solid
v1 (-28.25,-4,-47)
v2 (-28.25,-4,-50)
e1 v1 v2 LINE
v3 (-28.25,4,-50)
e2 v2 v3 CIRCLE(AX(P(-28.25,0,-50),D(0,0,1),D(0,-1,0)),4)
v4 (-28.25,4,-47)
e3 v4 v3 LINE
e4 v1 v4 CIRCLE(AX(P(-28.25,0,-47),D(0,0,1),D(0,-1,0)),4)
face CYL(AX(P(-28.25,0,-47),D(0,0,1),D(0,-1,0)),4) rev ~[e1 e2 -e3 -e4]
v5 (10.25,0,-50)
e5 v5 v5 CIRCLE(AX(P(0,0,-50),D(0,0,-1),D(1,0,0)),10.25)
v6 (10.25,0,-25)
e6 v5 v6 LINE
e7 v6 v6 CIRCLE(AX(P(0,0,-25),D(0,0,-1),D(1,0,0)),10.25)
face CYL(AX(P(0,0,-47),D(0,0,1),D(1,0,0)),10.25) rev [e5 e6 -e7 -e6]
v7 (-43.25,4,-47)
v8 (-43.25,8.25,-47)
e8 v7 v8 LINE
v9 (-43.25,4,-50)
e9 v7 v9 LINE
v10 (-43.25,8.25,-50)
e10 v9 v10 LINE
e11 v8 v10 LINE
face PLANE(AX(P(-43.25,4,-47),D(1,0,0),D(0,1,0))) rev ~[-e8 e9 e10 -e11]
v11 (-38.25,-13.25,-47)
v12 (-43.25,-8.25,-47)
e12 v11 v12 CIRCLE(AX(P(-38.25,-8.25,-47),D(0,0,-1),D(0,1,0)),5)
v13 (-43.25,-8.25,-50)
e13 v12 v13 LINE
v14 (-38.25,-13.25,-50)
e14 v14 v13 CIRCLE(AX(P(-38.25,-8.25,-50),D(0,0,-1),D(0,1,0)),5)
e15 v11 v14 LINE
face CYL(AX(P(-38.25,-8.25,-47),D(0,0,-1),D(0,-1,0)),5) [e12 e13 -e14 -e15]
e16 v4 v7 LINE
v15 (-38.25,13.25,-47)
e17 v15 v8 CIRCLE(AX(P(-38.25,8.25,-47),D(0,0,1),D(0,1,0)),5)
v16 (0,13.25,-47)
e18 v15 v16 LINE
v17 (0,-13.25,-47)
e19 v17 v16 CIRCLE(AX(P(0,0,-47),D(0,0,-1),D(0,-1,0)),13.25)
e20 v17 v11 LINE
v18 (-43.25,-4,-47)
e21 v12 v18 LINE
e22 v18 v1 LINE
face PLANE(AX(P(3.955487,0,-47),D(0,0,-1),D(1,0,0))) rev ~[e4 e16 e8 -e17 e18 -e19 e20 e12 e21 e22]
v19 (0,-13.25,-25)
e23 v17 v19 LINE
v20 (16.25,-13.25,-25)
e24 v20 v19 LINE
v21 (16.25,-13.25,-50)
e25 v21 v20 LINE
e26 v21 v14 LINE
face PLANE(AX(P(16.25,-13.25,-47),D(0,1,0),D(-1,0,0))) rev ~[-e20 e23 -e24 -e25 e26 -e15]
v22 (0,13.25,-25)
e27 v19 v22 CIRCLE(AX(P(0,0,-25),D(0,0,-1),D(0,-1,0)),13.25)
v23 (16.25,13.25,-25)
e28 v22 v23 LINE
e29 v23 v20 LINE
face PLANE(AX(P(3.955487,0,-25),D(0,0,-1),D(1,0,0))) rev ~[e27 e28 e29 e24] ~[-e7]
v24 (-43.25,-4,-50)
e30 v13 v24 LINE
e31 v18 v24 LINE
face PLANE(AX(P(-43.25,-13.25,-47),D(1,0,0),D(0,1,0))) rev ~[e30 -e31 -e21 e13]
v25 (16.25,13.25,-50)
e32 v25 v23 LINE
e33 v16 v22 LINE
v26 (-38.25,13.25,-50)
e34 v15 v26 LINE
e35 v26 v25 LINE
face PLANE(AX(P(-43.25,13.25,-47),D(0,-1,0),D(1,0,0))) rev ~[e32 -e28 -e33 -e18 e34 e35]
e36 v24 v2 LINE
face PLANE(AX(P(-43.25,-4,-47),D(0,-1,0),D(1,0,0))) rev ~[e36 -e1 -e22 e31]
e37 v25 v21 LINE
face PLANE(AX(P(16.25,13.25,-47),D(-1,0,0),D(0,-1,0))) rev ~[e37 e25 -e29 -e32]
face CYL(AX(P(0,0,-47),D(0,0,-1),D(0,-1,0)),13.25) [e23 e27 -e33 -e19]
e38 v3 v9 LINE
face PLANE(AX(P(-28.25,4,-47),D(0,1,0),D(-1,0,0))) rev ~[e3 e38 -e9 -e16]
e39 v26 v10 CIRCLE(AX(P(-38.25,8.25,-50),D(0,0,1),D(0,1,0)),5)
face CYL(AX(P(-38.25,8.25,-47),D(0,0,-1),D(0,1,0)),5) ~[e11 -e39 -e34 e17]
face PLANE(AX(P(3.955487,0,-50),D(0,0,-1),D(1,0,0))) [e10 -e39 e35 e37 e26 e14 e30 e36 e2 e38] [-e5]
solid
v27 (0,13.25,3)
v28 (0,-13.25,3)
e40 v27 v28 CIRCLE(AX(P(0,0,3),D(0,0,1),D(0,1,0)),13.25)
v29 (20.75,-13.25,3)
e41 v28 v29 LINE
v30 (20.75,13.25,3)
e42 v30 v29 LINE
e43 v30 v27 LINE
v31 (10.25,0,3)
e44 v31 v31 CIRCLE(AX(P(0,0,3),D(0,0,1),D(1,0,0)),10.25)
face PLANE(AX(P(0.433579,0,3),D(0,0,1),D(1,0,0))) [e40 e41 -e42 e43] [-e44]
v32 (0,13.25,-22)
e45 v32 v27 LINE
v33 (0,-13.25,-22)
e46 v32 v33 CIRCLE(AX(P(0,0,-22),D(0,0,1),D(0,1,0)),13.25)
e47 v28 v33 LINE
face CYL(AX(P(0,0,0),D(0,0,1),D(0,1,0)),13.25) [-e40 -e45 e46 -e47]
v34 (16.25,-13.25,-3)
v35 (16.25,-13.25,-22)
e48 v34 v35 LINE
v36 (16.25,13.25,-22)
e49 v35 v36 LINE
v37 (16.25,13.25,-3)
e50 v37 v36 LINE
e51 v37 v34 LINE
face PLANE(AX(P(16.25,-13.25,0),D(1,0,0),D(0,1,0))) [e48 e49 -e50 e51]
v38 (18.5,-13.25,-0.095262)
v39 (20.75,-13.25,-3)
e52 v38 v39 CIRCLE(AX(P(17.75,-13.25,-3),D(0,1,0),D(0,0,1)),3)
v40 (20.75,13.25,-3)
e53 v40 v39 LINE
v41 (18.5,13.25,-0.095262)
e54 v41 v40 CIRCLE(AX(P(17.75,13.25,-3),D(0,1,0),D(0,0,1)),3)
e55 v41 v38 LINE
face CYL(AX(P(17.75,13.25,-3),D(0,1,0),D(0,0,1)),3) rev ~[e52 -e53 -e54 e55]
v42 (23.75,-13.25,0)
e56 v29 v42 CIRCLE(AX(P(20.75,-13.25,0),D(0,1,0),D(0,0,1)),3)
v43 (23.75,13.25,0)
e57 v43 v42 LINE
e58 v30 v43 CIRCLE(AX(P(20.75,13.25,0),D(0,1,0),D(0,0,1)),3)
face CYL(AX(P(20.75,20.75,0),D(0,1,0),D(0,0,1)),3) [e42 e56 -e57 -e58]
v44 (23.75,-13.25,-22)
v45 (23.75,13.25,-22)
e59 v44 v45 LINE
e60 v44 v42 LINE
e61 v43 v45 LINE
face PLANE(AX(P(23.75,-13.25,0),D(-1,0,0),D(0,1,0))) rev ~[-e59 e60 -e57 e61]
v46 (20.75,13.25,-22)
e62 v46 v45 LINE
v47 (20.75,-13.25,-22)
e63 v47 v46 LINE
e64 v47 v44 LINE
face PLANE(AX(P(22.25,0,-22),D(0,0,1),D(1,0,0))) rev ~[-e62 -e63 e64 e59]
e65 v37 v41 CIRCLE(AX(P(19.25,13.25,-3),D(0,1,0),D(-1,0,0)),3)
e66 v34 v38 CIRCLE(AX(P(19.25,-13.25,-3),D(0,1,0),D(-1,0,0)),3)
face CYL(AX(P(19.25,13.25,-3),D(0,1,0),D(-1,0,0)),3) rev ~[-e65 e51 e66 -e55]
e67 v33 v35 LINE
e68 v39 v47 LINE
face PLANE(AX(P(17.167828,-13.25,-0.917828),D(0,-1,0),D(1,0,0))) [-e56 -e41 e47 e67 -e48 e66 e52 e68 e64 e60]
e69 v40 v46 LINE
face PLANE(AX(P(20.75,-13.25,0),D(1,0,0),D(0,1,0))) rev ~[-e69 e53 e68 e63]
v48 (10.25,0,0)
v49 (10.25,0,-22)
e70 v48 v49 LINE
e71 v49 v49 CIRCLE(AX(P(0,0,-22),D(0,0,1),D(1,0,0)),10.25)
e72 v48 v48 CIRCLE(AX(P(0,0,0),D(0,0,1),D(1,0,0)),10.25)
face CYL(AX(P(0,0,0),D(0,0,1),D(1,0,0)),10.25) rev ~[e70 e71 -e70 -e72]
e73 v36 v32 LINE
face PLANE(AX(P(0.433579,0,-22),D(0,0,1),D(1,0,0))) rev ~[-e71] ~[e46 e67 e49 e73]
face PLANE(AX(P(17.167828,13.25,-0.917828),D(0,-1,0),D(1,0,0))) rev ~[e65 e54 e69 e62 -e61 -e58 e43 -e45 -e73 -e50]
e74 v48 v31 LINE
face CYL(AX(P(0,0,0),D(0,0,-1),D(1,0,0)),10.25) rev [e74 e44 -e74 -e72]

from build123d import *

# Parameters (mm, degrees)
F0_R        = 10.25
F0_W        = 4.5
F0_H        = 26.5
F0_W_2      = 3
F1_DEPTH    = 3
F2_DEPTH    = 22
F3_T1_DEPTH = 26.5
F3_T3_DEPTH = 41.5
F5_R        = 10.25
F6_DEPTH    = 22
F7_DEPTH    = 3
F8_R        = 5


# Not quite as in the source:
# - a fillet or chamfer that OpenCascade refuses, or shapes differently, is made with other operations: its cross-section is extruded or revolved along the edge and cut away or added


with BuildPart() as f1:
    # F0 (on Top) → F1 (new body)
    with BuildSketch(Plane.XY):
        with BuildLine():
            ThreePointArc((0, -13.25), (9.3691648507, -9.3691648507), (13.25, 0))
            ThreePointArc((13.25, 0), (9.3691648507, 9.3691648507), (0, 13.25))
            ThreePointArc((0, 13.25), (-13.25, 0), (0, -13.25))
        make_face()
        Circle(F0_R, mode=Mode.SUBTRACT)
        with BuildLine():
            Line((13.25, -13.25), (13.25, 0))
            ThreePointArc((13.25, 0), (9.3691648507, -9.3691648507), (0, -13.25))
            Line((0, -13.25), (13.25, -13.25))
        make_face()
        with BuildLine():
            ThreePointArc((0, 13.25), (9.3691648507, 9.3691648507), (13.25, 0))
            Line((13.25, 0), (13.25, 13.25))
            Line((13.25, 13.25), (0, 13.25))
        make_face()
        Polygon((13.25, 13.25), (13.25, 0), (13.25, -13.25), (16.25, -13.25), (16.25, 13.25), align=None)
        with Locations((18.5, 0)):
            Rectangle(F0_W, F0_H)
        with Locations((22.25, 0)):
            Rectangle(F0_W_2, F0_H)
    extrude(amount=F1_DEPTH)

    # F0 (on Top) → F2 (join)
    with BuildSketch(Plane.XY):
        with BuildLine():
            ThreePointArc((0, -13.25), (9.3691648507, -9.3691648507), (13.25, 0))
            ThreePointArc((13.25, 0), (9.3691648507, 9.3691648507), (0, 13.25))
            ThreePointArc((0, 13.25), (-13.25, 0), (0, -13.25))
        make_face()
        Circle(F0_R, mode=Mode.SUBTRACT)
        with BuildLine():
            ThreePointArc((0, 13.25), (9.3691648507, 9.3691648507), (13.25, 0))
            Line((13.25, 0), (13.25, 13.25))
            Line((13.25, 13.25), (0, 13.25))
        make_face()
        Polygon((13.25, 13.25), (13.25, 0), (13.25, -13.25), (16.25, -13.25), (16.25, 13.25), align=None)
        with Locations((22.25, 0)):
            Rectangle(F0_W_2, F0_H)
        with BuildLine():
            Line((13.25, -13.25), (13.25, 0))
            ThreePointArc((13.25, 0), (9.3691648507, -9.3691648507), (0, -13.25))
            Line((0, -13.25), (13.25, -13.25))
        make_face()
    extrude(amount=-F2_DEPTH)

    # F3: fillet of radius 3 on 3 edges, made by hand

    # F3_s2 → F3_t1 (join)
    with BuildSketch(Plane.XZ.offset(-13.25)):
        with BuildLine():
            ThreePointArc((16.25, -3), (17.1286796564, -0.8786796564), (19.25, 0))
            Line((19.25, 0), (16.25, 0))
            Line((16.25, 0), (16.25, -3))
        make_face()
        with BuildLine():
            ThreePointArc((17.75, 0), (19.8713203436, -0.8786796564), (20.75, -3))
            Line((20.75, -3), (20.75, 0))
            Line((20.75, 0), (17.75, 0))
        make_face()
    extrude(amount=F3_T1_DEPTH)

    # F3_s4 → F3_t3 (cut)
    with BuildSketch(Plane.XZ.offset(-20.75)):
        with BuildLine():
            ThreePointArc((20.75, 3), (22.8713203436, 2.1213203436), (23.75, 0))
            Line((23.75, 0), (23.75, 3))
            Line((23.75, 3), (20.75, 3))
        make_face()
    extrude(amount=F3_T3_DEPTH, mode=Mode.SUBTRACT)


with BuildPart() as f6:
    # F5 (on offset) → F6 (new body)
    with BuildSketch(Plane(origin=(0, 0, -47), x_dir=(1, 0, 0), z_dir=(0, 0, -1))):
        with BuildLine():
            Line((16.25, 13.25), (0, 13.25))
            ThreePointArc((0, 13.25), (-13.25, 0), (0, -13.25))
            Line((0, -13.25), (16.25, -13.25))
            Line((16.25, -13.25), (16.25, 13.25))
        make_face()
        Circle(F5_R, mode=Mode.SUBTRACT)
    extrude(amount=-F6_DEPTH)

    # F5 (on offset) → F7 (join)
    with BuildSketch(Plane(origin=(0, 0, -47), x_dir=(1, 0, 0), z_dir=(0, 0, -1))):
        with BuildLine():
            Line((16.25, 13.25), (0, 13.25))
            ThreePointArc((0, 13.25), (-13.25, 0), (0, -13.25))
            Line((0, -13.25), (16.25, -13.25))
            Line((16.25, -13.25), (16.25, 13.25))
        make_face()
        Circle(F5_R, mode=Mode.SUBTRACT)
        with BuildLine():
            ThreePointArc((0, -13.25), (-13.25, 0), (0, 13.25))
            Line((0, 13.25), (-43.25, 13.25))
            Line((-43.25, 13.25), (-43.25, 4))
            Line((-43.25, 4), (-28.25, 4))
            ThreePointArc((-28.25, 4), (-24.25, 0), (-28.25, -4))
            Line((-28.25, -4), (-43.25, -4))
            Line((-43.25, -4), (-43.25, -13.25))
            Line((-43.25, -13.25), (0, -13.25))
        make_face()
    extrude(amount=F7_DEPTH)

    # F8
    f8_edges = [f6.edges().sort_by_distance(p)[0] for p in [
        (-43.25, -13.25, -48.5),
        (-43.25, 13.25, -48.5),
    ]]
    fillet(f8_edges, radius=F8_R)


solid = Compound([f1.part, f6.part])
